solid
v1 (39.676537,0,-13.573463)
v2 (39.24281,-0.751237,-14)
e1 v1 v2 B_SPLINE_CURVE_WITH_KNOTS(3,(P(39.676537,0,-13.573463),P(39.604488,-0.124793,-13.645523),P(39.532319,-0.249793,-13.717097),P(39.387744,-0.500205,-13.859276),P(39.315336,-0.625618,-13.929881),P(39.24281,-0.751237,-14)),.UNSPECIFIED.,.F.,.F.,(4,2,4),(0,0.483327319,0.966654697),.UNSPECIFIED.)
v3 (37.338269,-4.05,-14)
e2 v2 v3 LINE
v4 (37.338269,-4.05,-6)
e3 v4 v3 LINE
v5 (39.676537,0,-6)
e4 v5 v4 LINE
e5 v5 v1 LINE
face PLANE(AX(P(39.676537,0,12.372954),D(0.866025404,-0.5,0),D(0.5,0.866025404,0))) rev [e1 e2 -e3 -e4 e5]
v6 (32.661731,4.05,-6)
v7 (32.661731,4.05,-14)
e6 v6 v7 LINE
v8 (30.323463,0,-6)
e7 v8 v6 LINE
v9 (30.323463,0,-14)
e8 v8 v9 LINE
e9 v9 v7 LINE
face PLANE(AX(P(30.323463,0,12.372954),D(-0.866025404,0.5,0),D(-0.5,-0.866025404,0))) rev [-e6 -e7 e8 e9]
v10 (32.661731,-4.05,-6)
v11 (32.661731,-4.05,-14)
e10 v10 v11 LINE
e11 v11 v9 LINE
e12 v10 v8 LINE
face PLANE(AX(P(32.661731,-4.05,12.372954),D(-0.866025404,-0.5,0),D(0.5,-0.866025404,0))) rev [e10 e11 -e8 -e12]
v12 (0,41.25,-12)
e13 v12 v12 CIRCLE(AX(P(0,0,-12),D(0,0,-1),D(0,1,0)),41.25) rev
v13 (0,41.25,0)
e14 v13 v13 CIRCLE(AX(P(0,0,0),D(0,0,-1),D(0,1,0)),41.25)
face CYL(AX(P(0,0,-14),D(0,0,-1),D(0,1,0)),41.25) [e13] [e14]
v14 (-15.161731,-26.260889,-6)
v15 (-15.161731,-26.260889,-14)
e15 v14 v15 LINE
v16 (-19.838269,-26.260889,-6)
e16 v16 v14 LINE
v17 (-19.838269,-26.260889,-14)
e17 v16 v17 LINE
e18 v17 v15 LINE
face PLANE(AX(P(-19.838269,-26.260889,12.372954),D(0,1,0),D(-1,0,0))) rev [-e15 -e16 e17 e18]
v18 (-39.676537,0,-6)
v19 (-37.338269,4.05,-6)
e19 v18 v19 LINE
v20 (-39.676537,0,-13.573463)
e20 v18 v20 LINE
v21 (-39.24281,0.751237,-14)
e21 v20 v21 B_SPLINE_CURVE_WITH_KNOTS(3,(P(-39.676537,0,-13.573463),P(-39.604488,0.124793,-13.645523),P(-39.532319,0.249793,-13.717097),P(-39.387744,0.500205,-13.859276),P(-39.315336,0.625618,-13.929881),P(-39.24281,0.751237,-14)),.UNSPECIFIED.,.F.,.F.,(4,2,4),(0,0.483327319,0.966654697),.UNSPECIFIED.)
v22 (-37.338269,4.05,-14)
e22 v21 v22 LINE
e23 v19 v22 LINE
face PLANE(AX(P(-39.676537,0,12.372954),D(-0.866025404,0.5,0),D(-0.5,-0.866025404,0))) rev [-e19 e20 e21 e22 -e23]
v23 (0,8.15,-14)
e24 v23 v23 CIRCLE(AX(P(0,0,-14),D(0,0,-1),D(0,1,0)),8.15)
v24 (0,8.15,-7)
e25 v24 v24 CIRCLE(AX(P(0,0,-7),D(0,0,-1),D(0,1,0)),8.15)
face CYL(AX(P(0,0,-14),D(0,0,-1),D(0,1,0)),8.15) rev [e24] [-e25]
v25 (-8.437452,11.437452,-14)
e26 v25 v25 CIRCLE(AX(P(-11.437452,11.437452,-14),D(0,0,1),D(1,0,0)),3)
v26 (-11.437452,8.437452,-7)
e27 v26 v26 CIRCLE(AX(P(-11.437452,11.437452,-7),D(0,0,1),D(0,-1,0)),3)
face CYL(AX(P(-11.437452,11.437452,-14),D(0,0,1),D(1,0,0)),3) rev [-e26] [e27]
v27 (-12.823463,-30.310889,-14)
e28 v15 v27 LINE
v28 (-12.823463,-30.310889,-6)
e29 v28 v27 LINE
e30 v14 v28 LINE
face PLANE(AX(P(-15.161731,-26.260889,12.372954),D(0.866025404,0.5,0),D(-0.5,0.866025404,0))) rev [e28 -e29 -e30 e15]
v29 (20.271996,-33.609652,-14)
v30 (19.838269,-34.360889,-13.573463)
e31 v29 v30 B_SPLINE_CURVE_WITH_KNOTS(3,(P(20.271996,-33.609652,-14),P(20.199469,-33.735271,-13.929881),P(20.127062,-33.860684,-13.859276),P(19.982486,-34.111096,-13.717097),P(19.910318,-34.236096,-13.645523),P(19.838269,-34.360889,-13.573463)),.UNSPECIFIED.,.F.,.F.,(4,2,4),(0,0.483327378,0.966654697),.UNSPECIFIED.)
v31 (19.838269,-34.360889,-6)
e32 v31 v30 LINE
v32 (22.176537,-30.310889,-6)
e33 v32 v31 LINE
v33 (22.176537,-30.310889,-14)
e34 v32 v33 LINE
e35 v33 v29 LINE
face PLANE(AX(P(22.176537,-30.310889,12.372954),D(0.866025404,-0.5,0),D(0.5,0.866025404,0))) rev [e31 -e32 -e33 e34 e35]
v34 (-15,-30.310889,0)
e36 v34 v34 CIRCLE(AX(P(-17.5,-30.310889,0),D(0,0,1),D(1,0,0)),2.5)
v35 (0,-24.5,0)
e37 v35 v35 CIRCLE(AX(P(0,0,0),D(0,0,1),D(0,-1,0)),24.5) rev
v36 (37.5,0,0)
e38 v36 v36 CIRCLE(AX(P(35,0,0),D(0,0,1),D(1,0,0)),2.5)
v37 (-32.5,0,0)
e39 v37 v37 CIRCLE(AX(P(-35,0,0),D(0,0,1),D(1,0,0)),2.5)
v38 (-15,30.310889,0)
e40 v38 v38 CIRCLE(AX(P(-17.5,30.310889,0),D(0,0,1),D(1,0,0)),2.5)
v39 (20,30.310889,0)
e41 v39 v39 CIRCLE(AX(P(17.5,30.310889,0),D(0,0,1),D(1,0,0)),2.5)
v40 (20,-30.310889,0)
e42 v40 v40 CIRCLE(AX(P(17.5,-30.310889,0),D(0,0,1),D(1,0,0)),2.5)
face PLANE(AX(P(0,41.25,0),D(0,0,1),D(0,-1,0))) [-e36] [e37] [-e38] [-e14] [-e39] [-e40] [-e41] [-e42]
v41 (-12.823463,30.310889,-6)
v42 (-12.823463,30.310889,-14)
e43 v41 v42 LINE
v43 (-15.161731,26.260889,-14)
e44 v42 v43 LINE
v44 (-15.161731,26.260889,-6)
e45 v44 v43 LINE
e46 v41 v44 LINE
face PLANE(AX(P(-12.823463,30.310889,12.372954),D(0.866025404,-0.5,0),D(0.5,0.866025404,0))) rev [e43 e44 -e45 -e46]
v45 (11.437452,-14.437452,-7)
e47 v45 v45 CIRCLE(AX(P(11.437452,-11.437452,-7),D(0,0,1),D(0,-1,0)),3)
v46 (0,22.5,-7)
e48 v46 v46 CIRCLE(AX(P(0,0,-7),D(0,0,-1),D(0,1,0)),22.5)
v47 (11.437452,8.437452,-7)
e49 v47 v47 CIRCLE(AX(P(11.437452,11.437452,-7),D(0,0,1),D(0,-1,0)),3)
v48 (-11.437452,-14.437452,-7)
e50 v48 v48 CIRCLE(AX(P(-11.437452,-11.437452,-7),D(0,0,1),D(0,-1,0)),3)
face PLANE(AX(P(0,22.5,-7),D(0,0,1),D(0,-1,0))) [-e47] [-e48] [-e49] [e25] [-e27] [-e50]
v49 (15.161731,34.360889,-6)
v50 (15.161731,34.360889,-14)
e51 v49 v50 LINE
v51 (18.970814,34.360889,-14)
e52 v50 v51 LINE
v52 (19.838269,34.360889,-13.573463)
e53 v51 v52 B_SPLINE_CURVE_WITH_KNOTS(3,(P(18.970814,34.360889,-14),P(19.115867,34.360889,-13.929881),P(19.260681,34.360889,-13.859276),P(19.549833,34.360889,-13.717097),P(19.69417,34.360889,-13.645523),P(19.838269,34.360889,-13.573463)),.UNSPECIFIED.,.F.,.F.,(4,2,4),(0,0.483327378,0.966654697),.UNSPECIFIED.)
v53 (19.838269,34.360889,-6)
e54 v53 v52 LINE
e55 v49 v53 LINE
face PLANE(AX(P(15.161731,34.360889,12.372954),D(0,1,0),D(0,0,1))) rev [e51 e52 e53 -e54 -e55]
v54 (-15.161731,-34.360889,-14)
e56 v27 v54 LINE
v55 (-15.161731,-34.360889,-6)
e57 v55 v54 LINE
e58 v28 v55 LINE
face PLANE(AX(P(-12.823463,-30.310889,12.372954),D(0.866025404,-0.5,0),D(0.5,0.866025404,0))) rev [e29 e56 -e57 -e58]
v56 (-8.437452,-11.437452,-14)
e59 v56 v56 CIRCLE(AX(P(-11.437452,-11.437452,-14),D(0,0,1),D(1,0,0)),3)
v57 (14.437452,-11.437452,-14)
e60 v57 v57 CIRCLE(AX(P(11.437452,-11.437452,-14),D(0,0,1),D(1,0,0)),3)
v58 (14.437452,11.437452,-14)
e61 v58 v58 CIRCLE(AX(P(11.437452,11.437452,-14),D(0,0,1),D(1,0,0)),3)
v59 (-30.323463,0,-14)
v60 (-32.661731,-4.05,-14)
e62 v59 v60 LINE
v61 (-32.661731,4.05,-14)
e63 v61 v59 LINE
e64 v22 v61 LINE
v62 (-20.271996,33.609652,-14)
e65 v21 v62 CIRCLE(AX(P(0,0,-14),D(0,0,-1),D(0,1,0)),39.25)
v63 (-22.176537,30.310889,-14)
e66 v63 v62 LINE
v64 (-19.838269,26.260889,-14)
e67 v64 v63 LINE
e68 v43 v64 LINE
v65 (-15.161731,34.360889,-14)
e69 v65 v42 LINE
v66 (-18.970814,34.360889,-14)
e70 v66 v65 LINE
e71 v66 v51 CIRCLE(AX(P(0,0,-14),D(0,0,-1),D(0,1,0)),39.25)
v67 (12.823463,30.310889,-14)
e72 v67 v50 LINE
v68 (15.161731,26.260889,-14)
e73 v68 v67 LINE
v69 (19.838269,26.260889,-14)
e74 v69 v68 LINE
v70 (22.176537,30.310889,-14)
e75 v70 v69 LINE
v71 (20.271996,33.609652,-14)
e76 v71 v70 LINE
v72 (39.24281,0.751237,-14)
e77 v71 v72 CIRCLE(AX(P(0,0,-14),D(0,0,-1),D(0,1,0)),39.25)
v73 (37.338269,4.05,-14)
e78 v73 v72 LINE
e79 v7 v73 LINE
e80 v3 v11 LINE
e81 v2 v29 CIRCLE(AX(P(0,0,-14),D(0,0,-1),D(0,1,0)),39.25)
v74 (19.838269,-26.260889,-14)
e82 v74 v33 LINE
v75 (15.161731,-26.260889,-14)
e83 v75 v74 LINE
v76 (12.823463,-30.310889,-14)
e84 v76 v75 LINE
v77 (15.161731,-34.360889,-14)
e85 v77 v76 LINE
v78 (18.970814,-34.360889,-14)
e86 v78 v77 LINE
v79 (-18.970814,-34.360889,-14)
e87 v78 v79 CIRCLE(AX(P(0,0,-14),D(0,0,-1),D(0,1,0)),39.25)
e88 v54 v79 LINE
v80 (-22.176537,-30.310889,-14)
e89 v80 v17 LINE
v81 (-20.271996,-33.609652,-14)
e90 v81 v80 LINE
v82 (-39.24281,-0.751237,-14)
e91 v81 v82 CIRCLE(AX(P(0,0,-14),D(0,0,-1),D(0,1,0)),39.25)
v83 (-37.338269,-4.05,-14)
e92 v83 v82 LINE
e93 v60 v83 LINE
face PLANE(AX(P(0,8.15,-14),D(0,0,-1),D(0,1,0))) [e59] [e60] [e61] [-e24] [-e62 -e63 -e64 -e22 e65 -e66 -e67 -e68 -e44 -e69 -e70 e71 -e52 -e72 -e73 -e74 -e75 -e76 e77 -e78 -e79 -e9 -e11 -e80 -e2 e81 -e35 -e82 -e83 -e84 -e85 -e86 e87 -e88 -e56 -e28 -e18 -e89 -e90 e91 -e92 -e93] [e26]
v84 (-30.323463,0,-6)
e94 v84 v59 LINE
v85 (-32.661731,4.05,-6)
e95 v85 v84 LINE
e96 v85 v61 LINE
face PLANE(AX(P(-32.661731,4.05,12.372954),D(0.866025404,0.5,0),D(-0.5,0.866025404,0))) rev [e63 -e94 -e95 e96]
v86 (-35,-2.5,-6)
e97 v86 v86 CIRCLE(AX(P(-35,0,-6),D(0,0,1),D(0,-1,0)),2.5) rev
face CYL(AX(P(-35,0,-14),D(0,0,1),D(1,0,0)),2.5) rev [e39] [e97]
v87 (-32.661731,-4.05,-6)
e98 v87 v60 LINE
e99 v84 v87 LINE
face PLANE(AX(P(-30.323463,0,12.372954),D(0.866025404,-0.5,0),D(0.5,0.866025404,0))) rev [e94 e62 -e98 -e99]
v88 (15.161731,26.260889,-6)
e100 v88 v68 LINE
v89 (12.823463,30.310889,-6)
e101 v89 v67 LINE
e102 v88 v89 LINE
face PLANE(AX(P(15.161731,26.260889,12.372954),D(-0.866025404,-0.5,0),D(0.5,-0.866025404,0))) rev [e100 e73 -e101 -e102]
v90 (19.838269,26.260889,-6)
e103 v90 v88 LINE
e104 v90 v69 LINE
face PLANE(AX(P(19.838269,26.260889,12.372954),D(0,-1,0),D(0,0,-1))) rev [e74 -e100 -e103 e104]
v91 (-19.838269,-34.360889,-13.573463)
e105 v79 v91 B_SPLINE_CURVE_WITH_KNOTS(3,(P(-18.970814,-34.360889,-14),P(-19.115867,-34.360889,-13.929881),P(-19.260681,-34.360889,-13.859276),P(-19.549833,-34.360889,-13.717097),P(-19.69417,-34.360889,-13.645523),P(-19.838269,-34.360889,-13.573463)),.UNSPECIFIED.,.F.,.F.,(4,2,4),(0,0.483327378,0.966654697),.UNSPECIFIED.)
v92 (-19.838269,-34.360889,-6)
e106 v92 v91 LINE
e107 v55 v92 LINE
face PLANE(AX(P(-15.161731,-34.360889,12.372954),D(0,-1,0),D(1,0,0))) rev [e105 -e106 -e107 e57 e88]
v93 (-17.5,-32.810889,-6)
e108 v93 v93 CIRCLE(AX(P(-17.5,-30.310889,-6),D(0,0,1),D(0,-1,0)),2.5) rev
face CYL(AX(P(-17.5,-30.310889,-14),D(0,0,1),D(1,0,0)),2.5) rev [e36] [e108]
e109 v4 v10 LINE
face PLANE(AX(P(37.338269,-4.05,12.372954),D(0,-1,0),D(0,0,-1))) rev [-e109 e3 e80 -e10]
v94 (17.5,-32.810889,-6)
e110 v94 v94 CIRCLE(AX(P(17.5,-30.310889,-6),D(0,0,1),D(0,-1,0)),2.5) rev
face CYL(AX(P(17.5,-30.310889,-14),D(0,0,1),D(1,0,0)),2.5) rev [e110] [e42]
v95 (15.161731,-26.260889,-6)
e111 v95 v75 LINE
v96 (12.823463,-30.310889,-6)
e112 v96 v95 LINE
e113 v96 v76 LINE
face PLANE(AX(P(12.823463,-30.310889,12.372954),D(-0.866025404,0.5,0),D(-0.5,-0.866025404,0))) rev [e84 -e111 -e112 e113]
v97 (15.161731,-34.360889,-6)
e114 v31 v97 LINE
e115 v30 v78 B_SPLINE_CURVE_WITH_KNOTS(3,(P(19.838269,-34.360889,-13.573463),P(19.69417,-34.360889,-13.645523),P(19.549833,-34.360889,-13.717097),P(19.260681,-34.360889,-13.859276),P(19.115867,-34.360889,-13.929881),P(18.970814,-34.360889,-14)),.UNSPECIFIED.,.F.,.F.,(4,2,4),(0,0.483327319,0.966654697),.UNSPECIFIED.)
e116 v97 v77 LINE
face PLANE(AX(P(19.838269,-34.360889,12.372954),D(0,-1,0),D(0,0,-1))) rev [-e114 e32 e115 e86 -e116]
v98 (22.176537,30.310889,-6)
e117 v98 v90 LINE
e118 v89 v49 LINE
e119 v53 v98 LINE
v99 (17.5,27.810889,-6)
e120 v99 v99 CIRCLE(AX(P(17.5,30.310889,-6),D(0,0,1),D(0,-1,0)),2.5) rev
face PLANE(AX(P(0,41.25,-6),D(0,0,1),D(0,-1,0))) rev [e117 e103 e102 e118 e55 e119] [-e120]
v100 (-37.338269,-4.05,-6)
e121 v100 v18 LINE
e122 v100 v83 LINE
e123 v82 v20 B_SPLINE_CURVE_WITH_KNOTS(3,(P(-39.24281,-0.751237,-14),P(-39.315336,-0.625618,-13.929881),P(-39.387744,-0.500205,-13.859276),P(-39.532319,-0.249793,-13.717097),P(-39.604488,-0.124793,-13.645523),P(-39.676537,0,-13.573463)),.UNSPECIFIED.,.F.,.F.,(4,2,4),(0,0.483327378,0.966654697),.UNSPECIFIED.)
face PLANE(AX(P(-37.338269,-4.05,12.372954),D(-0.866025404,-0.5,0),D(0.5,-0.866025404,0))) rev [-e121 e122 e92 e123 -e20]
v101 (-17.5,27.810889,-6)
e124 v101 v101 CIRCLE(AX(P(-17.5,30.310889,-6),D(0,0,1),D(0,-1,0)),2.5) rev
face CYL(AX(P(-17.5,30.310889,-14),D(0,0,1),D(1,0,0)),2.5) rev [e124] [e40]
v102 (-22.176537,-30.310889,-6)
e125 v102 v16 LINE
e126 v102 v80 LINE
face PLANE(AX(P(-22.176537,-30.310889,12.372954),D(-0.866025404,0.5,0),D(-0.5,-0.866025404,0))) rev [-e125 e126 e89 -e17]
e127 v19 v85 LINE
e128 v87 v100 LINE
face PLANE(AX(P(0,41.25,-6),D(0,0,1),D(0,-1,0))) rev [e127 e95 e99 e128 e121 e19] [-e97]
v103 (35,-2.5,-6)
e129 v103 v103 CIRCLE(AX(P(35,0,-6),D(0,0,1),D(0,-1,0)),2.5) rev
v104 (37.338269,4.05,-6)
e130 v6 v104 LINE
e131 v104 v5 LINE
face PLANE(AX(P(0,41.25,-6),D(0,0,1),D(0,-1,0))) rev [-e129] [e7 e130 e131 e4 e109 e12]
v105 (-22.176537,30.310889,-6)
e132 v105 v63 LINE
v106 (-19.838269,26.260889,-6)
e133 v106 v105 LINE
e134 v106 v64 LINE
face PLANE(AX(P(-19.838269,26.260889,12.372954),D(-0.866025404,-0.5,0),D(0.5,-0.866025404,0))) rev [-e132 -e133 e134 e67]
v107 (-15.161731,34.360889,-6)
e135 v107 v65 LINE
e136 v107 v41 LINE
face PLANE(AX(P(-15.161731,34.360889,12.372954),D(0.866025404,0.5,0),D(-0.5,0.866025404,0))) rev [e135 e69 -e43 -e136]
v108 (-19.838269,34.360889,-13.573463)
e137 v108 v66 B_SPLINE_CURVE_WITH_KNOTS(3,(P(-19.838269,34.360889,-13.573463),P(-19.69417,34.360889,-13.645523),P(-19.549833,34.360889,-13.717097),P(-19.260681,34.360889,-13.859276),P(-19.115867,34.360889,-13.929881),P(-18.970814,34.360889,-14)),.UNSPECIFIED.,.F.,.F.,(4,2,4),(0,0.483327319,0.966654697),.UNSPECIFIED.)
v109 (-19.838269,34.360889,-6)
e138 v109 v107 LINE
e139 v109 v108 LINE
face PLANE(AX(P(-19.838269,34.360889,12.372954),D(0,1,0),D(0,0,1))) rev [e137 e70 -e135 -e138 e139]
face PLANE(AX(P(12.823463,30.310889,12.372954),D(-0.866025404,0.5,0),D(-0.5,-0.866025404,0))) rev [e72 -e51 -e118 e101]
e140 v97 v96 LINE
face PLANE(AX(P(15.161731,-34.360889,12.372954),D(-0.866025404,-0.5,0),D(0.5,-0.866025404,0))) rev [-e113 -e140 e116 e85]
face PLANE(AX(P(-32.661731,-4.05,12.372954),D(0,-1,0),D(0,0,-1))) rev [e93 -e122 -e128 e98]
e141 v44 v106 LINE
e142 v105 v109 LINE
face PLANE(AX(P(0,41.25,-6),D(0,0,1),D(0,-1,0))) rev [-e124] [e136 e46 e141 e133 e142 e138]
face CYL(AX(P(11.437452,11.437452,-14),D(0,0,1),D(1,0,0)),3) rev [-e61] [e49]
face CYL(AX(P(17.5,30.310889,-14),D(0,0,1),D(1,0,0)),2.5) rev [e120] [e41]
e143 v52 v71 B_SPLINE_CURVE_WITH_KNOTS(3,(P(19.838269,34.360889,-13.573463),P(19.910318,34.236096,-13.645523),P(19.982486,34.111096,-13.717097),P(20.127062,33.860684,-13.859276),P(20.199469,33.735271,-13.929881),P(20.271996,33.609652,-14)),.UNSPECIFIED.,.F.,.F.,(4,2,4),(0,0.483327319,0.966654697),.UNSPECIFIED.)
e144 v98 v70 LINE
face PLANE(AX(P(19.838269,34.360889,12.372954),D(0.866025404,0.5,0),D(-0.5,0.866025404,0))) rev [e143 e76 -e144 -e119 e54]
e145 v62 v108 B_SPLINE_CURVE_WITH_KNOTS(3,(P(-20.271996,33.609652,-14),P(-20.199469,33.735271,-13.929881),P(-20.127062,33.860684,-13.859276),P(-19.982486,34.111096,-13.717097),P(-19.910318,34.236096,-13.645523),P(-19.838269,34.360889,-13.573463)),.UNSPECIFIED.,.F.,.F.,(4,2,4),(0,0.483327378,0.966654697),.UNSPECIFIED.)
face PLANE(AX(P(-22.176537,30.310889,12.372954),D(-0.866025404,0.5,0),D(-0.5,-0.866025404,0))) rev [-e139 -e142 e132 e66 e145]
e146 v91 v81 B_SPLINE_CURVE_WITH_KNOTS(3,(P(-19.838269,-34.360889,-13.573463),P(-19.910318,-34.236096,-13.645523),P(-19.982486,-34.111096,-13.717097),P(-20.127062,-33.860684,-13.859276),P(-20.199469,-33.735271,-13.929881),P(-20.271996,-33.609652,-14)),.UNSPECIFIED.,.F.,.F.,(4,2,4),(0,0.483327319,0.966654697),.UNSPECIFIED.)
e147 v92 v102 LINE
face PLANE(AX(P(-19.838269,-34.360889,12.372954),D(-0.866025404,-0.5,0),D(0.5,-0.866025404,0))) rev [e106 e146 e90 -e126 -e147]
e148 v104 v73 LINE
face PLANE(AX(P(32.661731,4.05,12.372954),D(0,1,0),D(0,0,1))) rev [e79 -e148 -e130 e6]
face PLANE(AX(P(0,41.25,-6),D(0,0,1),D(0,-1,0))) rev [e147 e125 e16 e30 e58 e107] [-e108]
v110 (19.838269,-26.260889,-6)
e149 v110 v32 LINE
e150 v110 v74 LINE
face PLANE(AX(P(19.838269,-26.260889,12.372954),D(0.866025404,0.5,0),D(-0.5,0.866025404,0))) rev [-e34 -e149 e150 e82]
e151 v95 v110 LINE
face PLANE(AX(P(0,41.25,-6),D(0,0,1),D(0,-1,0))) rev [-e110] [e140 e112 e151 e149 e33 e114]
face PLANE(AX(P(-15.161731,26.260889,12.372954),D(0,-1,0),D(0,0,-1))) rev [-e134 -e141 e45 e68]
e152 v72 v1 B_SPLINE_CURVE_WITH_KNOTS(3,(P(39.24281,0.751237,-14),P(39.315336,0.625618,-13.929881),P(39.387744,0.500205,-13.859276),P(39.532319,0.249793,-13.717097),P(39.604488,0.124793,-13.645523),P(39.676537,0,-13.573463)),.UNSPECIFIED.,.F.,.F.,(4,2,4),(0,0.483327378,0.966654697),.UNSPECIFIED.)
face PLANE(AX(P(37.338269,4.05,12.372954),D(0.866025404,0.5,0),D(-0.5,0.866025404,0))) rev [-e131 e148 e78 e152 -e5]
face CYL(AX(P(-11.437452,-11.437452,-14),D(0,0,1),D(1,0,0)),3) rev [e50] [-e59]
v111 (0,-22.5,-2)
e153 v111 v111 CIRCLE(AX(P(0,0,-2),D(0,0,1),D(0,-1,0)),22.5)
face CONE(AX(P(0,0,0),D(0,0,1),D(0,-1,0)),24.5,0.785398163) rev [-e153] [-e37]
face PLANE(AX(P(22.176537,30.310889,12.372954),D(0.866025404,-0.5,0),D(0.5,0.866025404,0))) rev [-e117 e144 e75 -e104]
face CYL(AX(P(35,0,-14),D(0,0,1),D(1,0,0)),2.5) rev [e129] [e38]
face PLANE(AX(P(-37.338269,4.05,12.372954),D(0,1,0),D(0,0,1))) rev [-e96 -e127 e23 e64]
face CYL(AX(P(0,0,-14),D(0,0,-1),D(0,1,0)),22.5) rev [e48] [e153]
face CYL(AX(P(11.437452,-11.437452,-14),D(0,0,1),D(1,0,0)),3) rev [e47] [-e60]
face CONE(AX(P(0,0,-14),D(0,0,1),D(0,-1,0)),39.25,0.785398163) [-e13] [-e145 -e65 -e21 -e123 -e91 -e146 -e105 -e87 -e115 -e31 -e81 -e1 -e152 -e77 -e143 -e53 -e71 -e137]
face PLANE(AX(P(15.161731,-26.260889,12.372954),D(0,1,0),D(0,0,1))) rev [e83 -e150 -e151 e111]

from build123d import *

# Parameters (mm, degrees)
SKETCH_2_R          = 2.5
SKETCH_2_R_2        = 3
CUT_EXTRUDE_1_DEPTH = 60.99270789
CUT_EXTRUDE_2_DEPTH = 8
CHAMFER_1_SIZE      = 2


with BuildPart() as part:
    # 草图1 → 旋转1 (revolve)
    with BuildSketch(Plane(origin=(0, 0, 0), x_dir=(0, 0, -1), z_dir=(1, 0, 0))):
        Polygon((0, 41.25), (0, 22.5), (7, 22.5), (7, 8.15), (14, 8.15), (14, 41.25), align=None)
    revolve(axis=Axis((0, 0, -14), (0, 0, 1)))

    # 草图2 → 切除-拉伸1 (cut, through all)
    with BuildSketch(Plane.XY):
        with Locations((-17.5, 30.310889132)):
            Circle(SKETCH_2_R)
        with Locations((17.5, 30.310889132)):
            Circle(SKETCH_2_R)
        with Locations((35, 0)):
            Circle(SKETCH_2_R)
        with Locations((17.5, -30.310889132)):
            Circle(SKETCH_2_R)
        with Locations((-17.5, -30.310889132)):
            Circle(SKETCH_2_R)
        with Locations((-35, 0)):
            Circle(SKETCH_2_R)
        with Locations((-11.437452186, 11.437452186)):
            Circle(SKETCH_2_R_2)
        with Locations((11.437452186, 11.437452186)):
            Circle(SKETCH_2_R_2)
        with Locations((11.437452186, -11.437452186)):
            Circle(SKETCH_2_R_2)
        with Locations((-11.437452186, -11.437452186)):
            Circle(SKETCH_2_R_2)
    extrude(amount=-CUT_EXTRUDE_1_DEPTH, mode=Mode.SUBTRACT)

    # 草图3 → 切除-拉伸2 (cut)
    with BuildSketch(Plane(origin=(0, 0, -14), x_dir=(-1, 0, 0), z_dir=(0, 0, -1))):
        Polygon((-12.82346282, 30.310889132), (-15.16173141, 34.360889132), (-19.83826859, 34.360889132), (-22.17653718, 30.310889132), (-19.83826859, 26.260889132), (-15.16173141, 26.260889132), align=None)
        Polygon((19.83826859, 26.260889132), (22.17653718, 30.310889132), (19.83826859, 34.360889132), (15.16173141, 34.360889132), (12.82346282, 30.310889132), (15.16173141, 26.260889132), align=None)
        Polygon((32.66173141, -4.05), (37.33826859, -4.05), (39.67653718, 0), (37.33826859, 4.05), (32.66173141, 4.05), (30.32346282, 0), align=None)
        Polygon((19.83826859, -26.260889132), (15.16173141, -26.260889132), (12.82346282, -30.310889132), (15.16173141, -34.360889132), (19.83826859, -34.360889132), (22.17653718, -30.310889132), align=None)
        Polygon((-15.16173141, -26.260889132), (-19.83826859, -26.260889132), (-22.17653718, -30.310889132), (-19.83826859, -34.360889132), (-15.16173141, -34.360889132), (-12.82346282, -30.310889132), align=None)
        Polygon((-32.66173141, 4.05), (-37.33826859, 4.05), (-39.67653718, 0), (-37.33826859, -4.05), (-32.66173141, -4.05), (-30.32346282, 0), align=None)
    extrude(amount=-CUT_EXTRUDE_2_DEPTH, mode=Mode.SUBTRACT)

    # 倒角1
    # the kernel refuses this chamfer: 2 mm, written as the material it takes off along each edge
    with BuildSketch(Plane(origin=(0, 0, -14), x_dir=(0, 1, 0), z_dir=(1, 0, 0))) as chamfer_1_piece_1:
        Polygon((41.25, CHAMFER_1_SIZE), (41.25 - CHAMFER_1_SIZE, 0), (41.25, 0), align=None)
    revolve(axis=Axis((0, 0, -14), (0, 0, 1)), mode=Mode.SUBTRACT)
    with BuildSketch(Plane(origin=(0, 0, 0), x_dir=(0, 1, 0), z_dir=(1, 0, 0))) as chamfer_1_piece_2:
        Polygon((22.5 + CHAMFER_1_SIZE, 0), (22.5, -CHAMFER_1_SIZE), (22.5, 0), align=None)
    revolve(axis=Axis((0, 0, 0), (0, 0, 1)), mode=Mode.SUBTRACT)


solid = part.part
